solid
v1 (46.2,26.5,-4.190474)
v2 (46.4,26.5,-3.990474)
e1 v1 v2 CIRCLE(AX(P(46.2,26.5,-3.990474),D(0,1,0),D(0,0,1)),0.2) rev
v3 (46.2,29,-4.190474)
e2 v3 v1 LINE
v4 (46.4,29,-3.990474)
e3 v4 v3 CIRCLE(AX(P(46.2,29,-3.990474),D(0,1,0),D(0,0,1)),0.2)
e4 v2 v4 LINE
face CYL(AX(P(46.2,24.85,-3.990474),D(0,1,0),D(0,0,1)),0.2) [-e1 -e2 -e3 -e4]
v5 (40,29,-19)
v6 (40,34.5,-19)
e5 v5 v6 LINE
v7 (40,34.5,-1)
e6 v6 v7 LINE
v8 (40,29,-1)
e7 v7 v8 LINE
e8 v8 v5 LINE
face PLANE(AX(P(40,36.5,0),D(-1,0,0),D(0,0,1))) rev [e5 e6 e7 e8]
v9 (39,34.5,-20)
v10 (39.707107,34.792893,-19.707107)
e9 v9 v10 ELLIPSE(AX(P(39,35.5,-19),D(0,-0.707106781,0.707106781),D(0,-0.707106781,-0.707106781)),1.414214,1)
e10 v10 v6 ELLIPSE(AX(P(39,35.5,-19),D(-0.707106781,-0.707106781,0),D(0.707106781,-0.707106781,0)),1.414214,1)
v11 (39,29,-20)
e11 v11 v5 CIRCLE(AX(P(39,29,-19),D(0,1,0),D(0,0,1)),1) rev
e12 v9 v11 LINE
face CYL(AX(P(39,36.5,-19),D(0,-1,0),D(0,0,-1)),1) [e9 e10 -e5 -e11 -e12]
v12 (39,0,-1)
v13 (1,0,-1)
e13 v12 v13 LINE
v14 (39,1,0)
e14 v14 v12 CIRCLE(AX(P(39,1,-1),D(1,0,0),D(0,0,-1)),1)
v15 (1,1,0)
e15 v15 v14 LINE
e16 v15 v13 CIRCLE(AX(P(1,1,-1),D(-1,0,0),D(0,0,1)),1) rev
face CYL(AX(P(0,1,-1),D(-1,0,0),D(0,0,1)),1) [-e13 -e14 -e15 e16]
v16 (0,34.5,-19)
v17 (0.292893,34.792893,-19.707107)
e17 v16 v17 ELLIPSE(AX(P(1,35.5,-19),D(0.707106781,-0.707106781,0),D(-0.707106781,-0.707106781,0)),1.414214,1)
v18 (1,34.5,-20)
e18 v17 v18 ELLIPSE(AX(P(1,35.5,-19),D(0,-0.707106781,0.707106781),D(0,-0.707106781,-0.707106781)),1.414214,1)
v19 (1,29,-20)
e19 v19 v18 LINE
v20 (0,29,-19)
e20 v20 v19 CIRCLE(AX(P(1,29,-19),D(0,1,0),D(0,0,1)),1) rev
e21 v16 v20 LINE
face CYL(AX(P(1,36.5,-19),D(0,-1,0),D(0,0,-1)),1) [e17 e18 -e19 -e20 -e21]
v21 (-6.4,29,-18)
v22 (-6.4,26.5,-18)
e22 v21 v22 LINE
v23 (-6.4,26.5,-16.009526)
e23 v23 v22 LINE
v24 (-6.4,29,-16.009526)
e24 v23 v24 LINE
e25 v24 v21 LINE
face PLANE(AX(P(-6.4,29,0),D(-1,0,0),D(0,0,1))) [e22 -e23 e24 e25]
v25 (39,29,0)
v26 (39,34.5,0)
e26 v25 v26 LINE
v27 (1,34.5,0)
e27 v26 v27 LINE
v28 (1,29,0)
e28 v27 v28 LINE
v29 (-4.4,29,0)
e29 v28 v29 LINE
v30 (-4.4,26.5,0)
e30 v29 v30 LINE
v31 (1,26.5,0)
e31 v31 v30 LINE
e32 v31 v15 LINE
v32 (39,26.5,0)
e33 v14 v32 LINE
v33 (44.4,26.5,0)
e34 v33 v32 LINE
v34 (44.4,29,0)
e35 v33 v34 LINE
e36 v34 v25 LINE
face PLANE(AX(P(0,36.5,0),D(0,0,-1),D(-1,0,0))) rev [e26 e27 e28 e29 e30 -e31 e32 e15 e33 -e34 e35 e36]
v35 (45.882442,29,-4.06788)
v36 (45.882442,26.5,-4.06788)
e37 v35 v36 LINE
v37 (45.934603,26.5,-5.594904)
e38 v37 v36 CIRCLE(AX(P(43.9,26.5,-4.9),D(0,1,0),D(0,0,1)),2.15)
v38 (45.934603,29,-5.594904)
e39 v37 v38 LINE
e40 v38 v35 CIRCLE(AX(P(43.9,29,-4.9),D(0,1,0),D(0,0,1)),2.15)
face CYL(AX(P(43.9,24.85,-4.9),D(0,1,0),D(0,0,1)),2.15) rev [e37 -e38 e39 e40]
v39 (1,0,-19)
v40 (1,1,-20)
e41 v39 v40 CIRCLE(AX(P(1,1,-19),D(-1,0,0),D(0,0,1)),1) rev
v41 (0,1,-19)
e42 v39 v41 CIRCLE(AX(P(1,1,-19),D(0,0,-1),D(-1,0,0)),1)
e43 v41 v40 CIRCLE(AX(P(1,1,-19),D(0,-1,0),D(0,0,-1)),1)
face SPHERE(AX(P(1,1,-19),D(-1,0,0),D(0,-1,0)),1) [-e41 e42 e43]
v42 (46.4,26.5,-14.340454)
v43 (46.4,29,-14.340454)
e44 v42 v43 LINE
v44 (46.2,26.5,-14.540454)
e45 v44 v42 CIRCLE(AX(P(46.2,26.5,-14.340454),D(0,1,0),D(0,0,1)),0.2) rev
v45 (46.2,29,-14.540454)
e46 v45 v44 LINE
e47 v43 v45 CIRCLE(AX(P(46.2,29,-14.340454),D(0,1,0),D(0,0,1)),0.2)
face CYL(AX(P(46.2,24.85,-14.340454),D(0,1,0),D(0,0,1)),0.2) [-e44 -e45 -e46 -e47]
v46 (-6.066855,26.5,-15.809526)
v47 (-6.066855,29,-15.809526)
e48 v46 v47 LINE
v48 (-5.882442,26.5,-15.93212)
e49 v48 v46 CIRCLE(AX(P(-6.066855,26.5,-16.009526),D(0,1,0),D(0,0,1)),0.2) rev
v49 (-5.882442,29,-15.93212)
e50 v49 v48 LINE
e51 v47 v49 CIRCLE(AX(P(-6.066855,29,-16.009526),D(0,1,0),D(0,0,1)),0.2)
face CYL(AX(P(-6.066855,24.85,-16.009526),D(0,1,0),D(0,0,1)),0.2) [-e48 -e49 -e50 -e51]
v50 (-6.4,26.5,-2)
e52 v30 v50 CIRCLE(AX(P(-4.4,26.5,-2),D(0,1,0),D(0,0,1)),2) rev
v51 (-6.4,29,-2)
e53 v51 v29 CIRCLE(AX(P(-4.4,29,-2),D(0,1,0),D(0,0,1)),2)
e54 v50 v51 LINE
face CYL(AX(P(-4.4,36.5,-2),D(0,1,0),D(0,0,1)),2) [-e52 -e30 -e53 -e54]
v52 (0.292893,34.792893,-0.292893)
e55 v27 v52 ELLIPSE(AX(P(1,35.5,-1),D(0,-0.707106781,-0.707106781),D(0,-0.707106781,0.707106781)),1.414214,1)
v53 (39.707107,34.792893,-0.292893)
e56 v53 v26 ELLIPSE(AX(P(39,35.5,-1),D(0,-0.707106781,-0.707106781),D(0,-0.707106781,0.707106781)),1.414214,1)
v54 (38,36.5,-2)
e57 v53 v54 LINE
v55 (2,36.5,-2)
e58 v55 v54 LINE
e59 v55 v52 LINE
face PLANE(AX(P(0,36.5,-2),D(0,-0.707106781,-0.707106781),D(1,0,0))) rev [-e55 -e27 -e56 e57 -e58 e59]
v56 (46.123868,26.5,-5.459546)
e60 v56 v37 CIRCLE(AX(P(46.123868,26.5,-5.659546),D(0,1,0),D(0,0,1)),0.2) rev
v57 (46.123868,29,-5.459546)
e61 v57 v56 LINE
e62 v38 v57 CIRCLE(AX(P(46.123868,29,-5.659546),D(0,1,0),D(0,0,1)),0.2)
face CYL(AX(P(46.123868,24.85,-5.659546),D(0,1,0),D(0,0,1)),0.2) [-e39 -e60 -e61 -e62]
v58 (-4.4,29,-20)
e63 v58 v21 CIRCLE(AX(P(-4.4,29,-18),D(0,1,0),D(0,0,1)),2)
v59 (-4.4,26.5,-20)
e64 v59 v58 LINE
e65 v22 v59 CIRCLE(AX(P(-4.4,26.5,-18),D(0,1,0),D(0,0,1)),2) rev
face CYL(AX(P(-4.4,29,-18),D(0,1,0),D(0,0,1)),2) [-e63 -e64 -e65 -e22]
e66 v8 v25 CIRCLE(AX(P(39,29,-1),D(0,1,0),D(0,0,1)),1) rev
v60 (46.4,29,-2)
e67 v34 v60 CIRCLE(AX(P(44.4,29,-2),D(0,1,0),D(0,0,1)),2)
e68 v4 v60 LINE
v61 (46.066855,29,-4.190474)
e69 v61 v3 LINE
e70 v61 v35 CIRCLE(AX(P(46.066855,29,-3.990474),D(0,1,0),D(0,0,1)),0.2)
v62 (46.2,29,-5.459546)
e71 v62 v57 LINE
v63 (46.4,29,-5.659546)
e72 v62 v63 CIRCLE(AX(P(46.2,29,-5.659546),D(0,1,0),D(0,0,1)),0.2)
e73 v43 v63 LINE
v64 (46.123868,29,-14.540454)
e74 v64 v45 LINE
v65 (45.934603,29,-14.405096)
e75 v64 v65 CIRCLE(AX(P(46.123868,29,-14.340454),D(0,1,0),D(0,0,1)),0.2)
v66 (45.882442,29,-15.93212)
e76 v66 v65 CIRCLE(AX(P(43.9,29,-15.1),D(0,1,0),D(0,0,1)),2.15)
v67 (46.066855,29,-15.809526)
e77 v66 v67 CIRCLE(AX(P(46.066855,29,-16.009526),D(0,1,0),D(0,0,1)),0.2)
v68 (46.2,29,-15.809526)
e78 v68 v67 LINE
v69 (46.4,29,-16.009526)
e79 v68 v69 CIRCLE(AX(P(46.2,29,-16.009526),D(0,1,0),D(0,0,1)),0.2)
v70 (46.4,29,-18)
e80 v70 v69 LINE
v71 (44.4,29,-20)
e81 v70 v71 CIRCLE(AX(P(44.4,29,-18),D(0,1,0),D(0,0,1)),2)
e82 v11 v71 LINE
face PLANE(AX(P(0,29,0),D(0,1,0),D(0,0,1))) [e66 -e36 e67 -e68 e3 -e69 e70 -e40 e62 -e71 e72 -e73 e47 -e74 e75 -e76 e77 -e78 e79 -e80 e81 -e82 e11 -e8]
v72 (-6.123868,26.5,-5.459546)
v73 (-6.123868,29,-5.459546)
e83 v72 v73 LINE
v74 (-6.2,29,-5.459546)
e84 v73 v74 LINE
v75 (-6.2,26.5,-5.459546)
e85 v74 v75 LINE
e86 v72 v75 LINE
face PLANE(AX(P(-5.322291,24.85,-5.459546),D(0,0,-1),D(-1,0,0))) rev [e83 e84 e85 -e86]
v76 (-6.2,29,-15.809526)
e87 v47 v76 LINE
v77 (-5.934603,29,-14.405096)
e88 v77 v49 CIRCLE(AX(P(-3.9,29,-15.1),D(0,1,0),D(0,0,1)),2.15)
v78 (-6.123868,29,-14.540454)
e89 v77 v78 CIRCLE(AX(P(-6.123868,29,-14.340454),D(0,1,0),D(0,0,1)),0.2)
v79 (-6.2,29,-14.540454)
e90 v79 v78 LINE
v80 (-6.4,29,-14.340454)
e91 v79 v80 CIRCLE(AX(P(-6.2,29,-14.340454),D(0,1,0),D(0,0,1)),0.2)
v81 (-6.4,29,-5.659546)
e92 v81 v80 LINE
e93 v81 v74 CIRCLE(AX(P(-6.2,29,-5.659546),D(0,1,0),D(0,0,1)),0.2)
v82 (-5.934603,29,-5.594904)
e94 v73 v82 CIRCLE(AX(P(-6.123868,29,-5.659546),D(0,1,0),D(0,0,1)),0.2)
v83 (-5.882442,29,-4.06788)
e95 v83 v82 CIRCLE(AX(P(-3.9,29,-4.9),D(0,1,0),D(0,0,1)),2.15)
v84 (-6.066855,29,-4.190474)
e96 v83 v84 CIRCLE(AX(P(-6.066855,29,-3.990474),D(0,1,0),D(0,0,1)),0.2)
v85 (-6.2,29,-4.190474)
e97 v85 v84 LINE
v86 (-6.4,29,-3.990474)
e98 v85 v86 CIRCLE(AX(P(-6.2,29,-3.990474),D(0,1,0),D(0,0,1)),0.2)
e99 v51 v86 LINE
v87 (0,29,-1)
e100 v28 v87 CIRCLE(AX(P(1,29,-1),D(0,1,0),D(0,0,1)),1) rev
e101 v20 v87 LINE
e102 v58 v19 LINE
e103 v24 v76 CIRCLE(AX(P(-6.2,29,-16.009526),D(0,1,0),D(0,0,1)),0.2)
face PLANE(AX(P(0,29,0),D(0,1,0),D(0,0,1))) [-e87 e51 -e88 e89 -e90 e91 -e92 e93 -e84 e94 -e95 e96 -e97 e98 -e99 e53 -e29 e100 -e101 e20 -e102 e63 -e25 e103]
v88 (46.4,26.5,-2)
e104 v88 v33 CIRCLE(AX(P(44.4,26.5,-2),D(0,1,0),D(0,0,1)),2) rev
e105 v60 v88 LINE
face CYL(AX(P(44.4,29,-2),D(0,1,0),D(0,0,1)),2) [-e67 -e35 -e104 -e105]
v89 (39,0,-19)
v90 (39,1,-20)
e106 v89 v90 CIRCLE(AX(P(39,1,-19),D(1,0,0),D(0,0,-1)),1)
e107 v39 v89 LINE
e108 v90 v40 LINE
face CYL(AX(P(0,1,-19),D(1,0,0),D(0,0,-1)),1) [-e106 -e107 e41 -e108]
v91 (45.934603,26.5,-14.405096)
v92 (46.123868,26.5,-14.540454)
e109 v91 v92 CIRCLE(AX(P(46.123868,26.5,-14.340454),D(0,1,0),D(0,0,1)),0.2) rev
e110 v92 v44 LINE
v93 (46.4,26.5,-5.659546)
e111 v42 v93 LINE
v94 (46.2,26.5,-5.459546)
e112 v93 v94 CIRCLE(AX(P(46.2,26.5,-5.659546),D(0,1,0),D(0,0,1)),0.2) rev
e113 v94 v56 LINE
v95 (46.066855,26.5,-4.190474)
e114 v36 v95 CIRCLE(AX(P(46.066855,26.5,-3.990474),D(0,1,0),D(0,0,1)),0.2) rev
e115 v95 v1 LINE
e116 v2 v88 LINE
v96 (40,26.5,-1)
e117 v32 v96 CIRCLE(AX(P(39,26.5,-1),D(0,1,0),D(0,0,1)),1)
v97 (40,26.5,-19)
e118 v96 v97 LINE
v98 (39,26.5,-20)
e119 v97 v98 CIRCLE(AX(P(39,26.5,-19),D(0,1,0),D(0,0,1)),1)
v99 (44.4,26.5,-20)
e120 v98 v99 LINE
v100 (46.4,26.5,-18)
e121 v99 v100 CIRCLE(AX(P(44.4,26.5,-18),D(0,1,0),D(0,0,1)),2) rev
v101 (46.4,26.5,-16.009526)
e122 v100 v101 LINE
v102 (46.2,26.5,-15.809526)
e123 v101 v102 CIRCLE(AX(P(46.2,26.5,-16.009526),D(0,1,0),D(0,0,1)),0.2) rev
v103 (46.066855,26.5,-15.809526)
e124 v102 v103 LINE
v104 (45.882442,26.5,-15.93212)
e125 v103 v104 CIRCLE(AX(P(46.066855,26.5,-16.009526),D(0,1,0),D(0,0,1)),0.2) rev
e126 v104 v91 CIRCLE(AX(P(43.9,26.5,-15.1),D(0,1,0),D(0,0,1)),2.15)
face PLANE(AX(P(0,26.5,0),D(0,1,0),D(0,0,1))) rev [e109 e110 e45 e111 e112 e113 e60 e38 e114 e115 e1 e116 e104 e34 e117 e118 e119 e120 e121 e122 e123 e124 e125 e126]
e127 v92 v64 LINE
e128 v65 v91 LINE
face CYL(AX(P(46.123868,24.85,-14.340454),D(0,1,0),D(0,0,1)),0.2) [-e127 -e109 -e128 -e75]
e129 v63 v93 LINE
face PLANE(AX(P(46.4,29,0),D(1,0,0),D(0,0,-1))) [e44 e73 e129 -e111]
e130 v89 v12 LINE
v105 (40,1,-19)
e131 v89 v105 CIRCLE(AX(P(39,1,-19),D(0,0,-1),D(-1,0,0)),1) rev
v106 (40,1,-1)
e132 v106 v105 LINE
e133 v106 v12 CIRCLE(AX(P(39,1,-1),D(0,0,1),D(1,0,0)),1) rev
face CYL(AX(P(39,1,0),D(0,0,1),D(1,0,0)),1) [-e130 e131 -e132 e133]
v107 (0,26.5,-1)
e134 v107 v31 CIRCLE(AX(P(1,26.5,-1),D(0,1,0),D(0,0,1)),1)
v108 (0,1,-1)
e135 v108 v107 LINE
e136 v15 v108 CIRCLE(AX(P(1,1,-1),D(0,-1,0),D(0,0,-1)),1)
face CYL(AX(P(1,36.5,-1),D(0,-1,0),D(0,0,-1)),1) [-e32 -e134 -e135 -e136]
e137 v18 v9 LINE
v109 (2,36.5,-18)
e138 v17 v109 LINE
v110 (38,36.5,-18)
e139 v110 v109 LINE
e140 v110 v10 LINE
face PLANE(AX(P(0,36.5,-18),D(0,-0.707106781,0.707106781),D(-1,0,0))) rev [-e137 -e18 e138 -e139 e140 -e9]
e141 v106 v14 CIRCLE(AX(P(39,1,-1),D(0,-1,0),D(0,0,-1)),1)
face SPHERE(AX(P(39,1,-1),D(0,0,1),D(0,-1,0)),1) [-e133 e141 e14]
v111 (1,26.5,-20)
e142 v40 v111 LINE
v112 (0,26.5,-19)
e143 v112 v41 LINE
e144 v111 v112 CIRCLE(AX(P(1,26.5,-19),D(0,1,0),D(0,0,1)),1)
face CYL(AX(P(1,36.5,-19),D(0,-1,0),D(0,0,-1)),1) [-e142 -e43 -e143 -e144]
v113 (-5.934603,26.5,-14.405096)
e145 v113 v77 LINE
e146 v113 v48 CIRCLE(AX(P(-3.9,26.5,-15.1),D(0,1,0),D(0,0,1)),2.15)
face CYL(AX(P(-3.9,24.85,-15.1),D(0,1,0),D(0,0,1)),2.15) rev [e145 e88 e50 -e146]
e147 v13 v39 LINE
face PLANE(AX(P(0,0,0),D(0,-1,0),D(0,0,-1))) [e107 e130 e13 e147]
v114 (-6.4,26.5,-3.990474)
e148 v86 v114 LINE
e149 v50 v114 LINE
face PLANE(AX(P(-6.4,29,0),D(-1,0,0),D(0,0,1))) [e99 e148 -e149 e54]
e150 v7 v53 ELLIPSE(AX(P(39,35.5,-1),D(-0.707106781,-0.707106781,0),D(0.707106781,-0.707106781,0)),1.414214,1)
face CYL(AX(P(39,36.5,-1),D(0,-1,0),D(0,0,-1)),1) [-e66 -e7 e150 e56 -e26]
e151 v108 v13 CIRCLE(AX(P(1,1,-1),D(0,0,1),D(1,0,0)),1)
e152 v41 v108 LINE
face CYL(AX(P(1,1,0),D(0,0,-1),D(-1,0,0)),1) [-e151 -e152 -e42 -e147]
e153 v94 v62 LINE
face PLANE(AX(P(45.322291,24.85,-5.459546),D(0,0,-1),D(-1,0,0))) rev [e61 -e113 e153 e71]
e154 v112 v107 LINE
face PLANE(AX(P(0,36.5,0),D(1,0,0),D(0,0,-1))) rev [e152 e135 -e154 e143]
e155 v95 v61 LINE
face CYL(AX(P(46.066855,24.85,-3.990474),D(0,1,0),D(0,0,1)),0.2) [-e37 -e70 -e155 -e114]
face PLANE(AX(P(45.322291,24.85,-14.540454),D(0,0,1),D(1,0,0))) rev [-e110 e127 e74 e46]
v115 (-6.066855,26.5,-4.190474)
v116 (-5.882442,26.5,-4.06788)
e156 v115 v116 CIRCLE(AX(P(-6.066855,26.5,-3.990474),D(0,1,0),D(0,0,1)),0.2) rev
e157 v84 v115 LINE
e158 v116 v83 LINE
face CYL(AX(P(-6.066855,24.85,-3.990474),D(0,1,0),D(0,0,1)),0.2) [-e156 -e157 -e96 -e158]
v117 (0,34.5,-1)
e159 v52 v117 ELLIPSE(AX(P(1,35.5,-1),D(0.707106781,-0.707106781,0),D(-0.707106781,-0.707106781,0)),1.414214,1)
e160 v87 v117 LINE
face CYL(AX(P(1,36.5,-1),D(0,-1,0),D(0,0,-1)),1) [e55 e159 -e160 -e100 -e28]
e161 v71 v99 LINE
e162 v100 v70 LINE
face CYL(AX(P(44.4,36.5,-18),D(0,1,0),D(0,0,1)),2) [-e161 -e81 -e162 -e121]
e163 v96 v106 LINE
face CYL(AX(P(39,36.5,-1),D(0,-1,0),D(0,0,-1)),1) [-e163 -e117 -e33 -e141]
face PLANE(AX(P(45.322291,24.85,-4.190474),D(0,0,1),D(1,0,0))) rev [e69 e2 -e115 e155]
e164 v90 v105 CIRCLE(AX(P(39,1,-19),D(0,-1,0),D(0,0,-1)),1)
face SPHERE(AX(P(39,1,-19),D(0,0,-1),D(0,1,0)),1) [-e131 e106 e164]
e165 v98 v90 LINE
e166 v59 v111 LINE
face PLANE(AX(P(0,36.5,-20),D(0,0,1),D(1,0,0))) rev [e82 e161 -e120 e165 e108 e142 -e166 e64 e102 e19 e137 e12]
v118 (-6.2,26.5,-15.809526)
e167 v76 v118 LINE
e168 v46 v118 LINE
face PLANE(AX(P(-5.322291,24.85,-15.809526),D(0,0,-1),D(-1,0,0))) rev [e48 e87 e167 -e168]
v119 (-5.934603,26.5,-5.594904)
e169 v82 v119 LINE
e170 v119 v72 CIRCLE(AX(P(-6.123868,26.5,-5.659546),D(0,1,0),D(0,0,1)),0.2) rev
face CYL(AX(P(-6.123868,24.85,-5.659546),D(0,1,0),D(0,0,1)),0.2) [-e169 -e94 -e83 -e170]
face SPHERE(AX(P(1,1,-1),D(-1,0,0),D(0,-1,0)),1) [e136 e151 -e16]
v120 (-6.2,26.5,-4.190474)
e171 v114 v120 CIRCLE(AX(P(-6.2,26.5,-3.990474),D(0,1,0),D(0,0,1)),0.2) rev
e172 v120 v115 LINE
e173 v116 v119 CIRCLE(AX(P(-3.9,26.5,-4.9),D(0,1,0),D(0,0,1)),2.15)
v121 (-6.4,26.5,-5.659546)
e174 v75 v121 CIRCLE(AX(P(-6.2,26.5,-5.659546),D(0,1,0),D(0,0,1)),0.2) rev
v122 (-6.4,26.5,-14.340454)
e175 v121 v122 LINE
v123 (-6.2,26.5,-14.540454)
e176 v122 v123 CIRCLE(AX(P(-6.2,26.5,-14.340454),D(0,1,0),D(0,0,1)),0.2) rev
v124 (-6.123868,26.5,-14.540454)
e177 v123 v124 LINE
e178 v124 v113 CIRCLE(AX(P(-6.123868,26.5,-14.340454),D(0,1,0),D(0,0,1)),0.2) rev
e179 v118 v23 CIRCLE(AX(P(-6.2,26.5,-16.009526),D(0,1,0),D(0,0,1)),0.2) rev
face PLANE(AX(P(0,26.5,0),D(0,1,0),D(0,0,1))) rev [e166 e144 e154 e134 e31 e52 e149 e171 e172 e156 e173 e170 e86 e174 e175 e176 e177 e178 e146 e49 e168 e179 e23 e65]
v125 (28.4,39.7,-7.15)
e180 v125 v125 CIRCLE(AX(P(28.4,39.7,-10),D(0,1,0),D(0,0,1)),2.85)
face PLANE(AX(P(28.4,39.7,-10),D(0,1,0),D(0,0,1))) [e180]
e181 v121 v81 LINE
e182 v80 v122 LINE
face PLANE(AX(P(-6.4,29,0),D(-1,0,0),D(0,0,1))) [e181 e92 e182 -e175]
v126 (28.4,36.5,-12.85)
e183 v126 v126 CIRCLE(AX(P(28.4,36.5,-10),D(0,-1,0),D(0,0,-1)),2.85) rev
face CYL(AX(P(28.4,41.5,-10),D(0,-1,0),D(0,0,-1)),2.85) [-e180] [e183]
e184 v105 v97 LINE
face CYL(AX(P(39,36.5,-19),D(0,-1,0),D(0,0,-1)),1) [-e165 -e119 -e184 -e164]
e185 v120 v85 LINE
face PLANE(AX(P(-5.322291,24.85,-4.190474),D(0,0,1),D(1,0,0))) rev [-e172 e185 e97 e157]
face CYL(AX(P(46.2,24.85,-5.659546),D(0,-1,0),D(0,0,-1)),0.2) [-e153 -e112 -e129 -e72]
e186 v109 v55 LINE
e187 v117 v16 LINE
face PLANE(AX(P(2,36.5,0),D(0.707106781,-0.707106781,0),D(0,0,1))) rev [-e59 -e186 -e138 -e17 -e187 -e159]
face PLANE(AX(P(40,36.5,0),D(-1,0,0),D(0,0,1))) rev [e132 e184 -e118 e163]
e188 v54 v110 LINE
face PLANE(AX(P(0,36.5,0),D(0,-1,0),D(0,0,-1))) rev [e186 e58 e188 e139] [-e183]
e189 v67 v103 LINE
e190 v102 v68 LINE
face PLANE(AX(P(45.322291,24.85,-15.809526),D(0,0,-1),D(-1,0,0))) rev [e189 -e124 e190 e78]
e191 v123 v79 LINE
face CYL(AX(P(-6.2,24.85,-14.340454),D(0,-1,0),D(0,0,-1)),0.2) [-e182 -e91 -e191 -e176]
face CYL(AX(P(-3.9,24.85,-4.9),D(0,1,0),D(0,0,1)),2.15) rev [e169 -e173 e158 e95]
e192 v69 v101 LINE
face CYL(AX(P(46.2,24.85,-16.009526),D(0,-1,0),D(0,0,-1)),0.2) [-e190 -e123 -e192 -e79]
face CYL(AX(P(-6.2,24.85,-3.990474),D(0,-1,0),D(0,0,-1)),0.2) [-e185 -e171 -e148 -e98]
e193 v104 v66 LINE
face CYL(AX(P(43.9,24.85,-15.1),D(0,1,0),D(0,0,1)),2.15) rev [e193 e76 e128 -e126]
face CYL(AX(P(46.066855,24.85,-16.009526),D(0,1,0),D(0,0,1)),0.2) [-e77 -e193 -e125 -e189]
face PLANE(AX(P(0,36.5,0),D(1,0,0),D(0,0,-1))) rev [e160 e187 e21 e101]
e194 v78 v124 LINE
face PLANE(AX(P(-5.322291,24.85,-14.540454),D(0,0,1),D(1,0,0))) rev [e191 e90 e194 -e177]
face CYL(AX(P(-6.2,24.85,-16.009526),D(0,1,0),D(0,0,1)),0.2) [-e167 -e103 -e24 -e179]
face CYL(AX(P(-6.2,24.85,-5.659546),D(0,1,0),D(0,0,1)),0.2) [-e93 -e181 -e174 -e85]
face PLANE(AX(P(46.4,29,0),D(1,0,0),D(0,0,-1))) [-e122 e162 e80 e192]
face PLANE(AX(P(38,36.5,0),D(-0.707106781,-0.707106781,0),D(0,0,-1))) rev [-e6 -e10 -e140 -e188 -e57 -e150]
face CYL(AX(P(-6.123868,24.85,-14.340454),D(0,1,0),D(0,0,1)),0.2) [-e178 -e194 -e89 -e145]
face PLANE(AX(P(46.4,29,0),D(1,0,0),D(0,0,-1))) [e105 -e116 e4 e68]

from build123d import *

# Parameters (mm, degrees)
SKETCH_1_W           = 40
SKETCH_1_H           = 20
EXTRUDE_1_DEPTH      = 36.5
SKETCH_2_W           = 52.8
SKETCH_2_H           = 20
EXTRUDE_2_DEPTH      = 2.5
SKETCH_3_R           = 2.15
CUT_EXTRUDE_1_DEPTH  = 4.15
SKETCH_4_W           = 1.589858097
SKETCH_4_H           = 1.269072198
CUT_EXTRUDE_2_DEPTH  = 4.15
FILLET_2_R           = 2
FILLET_3_R           = 1
FILLET_7_R           = 0.2
FILLET_8_R           = 0.2
FILLET_START         = 38.537319575
FILLET_3_2_OUTLINE_W = 42
FILLET_3_2_OUTLINE_H = 6
FILLET_3_2_DEPTH     = 2.462680425
FILLET_START_2       = 24.395183951
FILLET_4_OUTLINE_W   = 42
FILLET_4_OUTLINE_H   = 6
FILLET_4_DEPTH       = 2.604816049
FILLET_START_3       = 52.679455198
FILLET_5_OUTLINE_W   = 5
FILLET_5_OUTLINE_H   = 22
FILLET_5_DEPTH       = 2.320544802
FILLET_START_4       = -27
FILLET_6_OUTLINE_W   = 6
FILLET_6_OUTLINE_H   = 22
FILLET_6_DEPTH       = 2.604816049
SKETCH_5_R           = 2.85
EXTRUDE_3_DEPTH      = 5
CUT_EXTRUDE_START    = -1.8
SKETCH_6_R           = 2.85
CUT_EXTRUDE_3_DEPTH  = 1.8


with BuildPart() as part:
    # 草图1 → 凸台-拉伸1 (new body)
    with BuildSketch(Plane(origin=(0, 0, 0), x_dir=(1, 0, 0), z_dir=(0, 1, 0))):
        with Locations((20, 10)):
            Rectangle(SKETCH_1_W, SKETCH_1_H)
    extrude(amount=EXTRUDE_1_DEPTH)

    # 草图2 → 凸台-拉伸2 (add)
    with BuildSketch(Plane(origin=(0, 26.5, 0), x_dir=(-1, 0, 0), z_dir=(0, -1, 0))):
        with Locations((-20, 10)):
            Rectangle(SKETCH_2_W, SKETCH_2_H)
    extrude(amount=-EXTRUDE_2_DEPTH)

    # 草图3 → 切除-拉伸1 (cut)
    with BuildSketch(Plane(origin=(0, 29, 0), x_dir=(1, 0, 0), z_dir=(0, 1, 0))):
        with Locations(Location((43.9, 15.1, 0), (0, 0, 270))):
            Circle(SKETCH_3_R)
        with Locations(Location((43.9, 4.9, 0), (0, 0, 270))):
            Circle(SKETCH_3_R)
        with Locations(Location((-3.9, 15.1, 0), (0, 0, 270))):
            Circle(SKETCH_3_R)
        with Locations(Location((-3.9, 4.9, 0), (0, 0, 270))):
            Circle(SKETCH_3_R)
    extrude(amount=-CUT_EXTRUDE_1_DEPTH, mode=Mode.SUBTRACT)

    # 草图4 → 切除-拉伸2 (cut)
    with BuildSketch(Plane(origin=(0, 29, 0), x_dir=(1, 0, 0), z_dir=(0, 1, 0))):
        with Locations((-6.117219692, 15.174989867)):
            Rectangle(SKETCH_4_W, SKETCH_4_H)
        with Locations((46.117219692, 15.174989867)):
            Rectangle(SKETCH_4_W, SKETCH_4_H)
        with Locations((46.117219692, 4.825010133)):
            Rectangle(SKETCH_4_W, SKETCH_4_H)
        with Locations((-6.117219692, 4.825010133)):
            Rectangle(SKETCH_4_W, SKETCH_4_H)
    extrude(amount=-CUT_EXTRUDE_2_DEPTH, mode=Mode.SUBTRACT)

    # 圆角2
    fillet_2_edges = [part.edges().sort_by_distance(p)[0] for p in [
        (46.4, 27.75, -20),
        (-6.4, 27.75, 0),
        (46.4, 27.75, 0),
        (-6.4, 27.75, -20),
    ]]
    fillet(fillet_2_edges, radius=FILLET_2_R)

    # Fillet 3
    fillet_3_edges = [part.edges().sort_by_distance(p)[0] for p in [
        (0, 13.25, -20),
        (40, 13.25, -20),
        (40, 13.25, 0),
        (0, 13.25, 0),
        (20, 0, -20),
        (40, 0, -10),
        (20, 0, 0),
        (0, 0, -10),
        (0, 32.75, -20),
        (40, 32.75, -20),
        (40, 32.75, 0),
        (0, 32.75, 0),
    ]]
    fillet(fillet_3_edges, radius=FILLET_3_R)

    # 圆角7
    fillet_7_edges = [part.edges().sort_by_distance(p)[0] for p in [
        (46.4, 27.75, -4.190474034),
        (46.4, 27.75, -5.459546232),
        (45.97591137, 27.75, -5.459546232),
        (45.929549926, 27.75, -4.190474034),
        (45.97591137, 27.75, -14.540453768),
        (45.929549926, 27.75, -15.809525966),
        (-5.97591137, 27.75, -5.459546232),
        (-5.929549926, 27.75, -4.190474034),
        (46.4, 27.75, -15.809525966),
        (46.4, 27.75, -14.540453768),
        (-6.4, 27.75, -4.190474034),
        (-6.4, 27.75, -5.459546232),
    ]]
    fillet(fillet_7_edges, radius=FILLET_7_R)

    # 圆角8
    fillet_8_edges = [part.edges().sort_by_distance(p)[0] for p in [
        (-6.4, 27.75, -14.540453768),
        (-6.4, 27.75, -15.809525966),
        (-5.929549926, 27.75, -15.809525966),
        (-5.97591137, 27.75, -14.540453768),
    ]]
    fillet(fillet_8_edges, radius=FILLET_8_R)

    # Fillet 3 2: read off the stored shape, not the designer's step
    # Fillet 3 2 outline → Fillet 3 2 (cut)
    with BuildSketch(Plane(origin=(0, 0, 0), x_dir=(1, 0, 0), z_dir=(0, 0.707106781186547, -0.707106781186548)).offset(FILLET_START)):
        with Locations((20, -12)):
            Rectangle(FILLET_3_2_OUTLINE_W, FILLET_3_2_OUTLINE_H)
    extrude(amount=FILLET_3_2_DEPTH, mode=Mode.SUBTRACT)

    # 倒角4: read off the stored shape, not the designer's step
    # 倒角4 outline → 倒角4 (cut)
    with BuildSketch(Plane(origin=(0, 0, 0), x_dir=(1, 0, 0), z_dir=(0, 0.707106781186547, 0.707106781186548)).offset(FILLET_START_2)):
        with Locations((20, 26)):
            Rectangle(FILLET_4_OUTLINE_W, FILLET_4_OUTLINE_H)
    extrude(amount=FILLET_4_DEPTH, mode=Mode.SUBTRACT)

    # 倒角5: read off the stored shape, not the designer's step
    # 倒角5 outline → 倒角5 (cut)
    with BuildSketch(Plane(origin=(0, 0, 0), x_dir=(0.707106781186546, -0.707106781186549, 0), z_dir=(0.707106781186549, 0.707106781186546, 0)).offset(FILLET_START_3)):
        with Locations((2.5, 10)):
            Rectangle(FILLET_5_OUTLINE_W, FILLET_5_OUTLINE_H)
    extrude(amount=FILLET_5_DEPTH, mode=Mode.SUBTRACT)

    # 倒角6: read off the stored shape, not the designer's step
    # 倒角6 outline → 倒角6 (cut)
    with BuildSketch(Plane(origin=(0, 0, 0), x_dir=(0.7071067811865471, 0.707106781186548, 0), z_dir=(0.707106781186548, -0.707106781186547, 0)).offset(FILLET_START_4)):
        with Locations((26, -10)):
            Rectangle(FILLET_6_OUTLINE_W, FILLET_6_OUTLINE_H)
    extrude(amount=FILLET_6_DEPTH, mode=Mode.SUBTRACT)

    # 草图5 → 凸台-拉伸3 (add)
    with BuildSketch(Plane(origin=(0, 36.5, 0), x_dir=(1, 0, 0), z_dir=(0, 1, 0))):
        with Locations(Location((28.4, 10, 0), (0, 0, 90))):
            Circle(SKETCH_5_R)
    extrude(amount=EXTRUDE_3_DEPTH)

    # 草图6 → 切除-拉伸3 (cut)
    with BuildSketch(Plane(origin=(0, 41.5, 0), x_dir=(1, 0, 0), z_dir=(0, 1, 0)).offset(CUT_EXTRUDE_START)):
        with Locations(Location((28.4, 10, 0), (0, 0, 90))):
            Circle(SKETCH_6_R)
    extrude(amount=CUT_EXTRUDE_3_DEPTH, mode=Mode.SUBTRACT)


solid = part.part
